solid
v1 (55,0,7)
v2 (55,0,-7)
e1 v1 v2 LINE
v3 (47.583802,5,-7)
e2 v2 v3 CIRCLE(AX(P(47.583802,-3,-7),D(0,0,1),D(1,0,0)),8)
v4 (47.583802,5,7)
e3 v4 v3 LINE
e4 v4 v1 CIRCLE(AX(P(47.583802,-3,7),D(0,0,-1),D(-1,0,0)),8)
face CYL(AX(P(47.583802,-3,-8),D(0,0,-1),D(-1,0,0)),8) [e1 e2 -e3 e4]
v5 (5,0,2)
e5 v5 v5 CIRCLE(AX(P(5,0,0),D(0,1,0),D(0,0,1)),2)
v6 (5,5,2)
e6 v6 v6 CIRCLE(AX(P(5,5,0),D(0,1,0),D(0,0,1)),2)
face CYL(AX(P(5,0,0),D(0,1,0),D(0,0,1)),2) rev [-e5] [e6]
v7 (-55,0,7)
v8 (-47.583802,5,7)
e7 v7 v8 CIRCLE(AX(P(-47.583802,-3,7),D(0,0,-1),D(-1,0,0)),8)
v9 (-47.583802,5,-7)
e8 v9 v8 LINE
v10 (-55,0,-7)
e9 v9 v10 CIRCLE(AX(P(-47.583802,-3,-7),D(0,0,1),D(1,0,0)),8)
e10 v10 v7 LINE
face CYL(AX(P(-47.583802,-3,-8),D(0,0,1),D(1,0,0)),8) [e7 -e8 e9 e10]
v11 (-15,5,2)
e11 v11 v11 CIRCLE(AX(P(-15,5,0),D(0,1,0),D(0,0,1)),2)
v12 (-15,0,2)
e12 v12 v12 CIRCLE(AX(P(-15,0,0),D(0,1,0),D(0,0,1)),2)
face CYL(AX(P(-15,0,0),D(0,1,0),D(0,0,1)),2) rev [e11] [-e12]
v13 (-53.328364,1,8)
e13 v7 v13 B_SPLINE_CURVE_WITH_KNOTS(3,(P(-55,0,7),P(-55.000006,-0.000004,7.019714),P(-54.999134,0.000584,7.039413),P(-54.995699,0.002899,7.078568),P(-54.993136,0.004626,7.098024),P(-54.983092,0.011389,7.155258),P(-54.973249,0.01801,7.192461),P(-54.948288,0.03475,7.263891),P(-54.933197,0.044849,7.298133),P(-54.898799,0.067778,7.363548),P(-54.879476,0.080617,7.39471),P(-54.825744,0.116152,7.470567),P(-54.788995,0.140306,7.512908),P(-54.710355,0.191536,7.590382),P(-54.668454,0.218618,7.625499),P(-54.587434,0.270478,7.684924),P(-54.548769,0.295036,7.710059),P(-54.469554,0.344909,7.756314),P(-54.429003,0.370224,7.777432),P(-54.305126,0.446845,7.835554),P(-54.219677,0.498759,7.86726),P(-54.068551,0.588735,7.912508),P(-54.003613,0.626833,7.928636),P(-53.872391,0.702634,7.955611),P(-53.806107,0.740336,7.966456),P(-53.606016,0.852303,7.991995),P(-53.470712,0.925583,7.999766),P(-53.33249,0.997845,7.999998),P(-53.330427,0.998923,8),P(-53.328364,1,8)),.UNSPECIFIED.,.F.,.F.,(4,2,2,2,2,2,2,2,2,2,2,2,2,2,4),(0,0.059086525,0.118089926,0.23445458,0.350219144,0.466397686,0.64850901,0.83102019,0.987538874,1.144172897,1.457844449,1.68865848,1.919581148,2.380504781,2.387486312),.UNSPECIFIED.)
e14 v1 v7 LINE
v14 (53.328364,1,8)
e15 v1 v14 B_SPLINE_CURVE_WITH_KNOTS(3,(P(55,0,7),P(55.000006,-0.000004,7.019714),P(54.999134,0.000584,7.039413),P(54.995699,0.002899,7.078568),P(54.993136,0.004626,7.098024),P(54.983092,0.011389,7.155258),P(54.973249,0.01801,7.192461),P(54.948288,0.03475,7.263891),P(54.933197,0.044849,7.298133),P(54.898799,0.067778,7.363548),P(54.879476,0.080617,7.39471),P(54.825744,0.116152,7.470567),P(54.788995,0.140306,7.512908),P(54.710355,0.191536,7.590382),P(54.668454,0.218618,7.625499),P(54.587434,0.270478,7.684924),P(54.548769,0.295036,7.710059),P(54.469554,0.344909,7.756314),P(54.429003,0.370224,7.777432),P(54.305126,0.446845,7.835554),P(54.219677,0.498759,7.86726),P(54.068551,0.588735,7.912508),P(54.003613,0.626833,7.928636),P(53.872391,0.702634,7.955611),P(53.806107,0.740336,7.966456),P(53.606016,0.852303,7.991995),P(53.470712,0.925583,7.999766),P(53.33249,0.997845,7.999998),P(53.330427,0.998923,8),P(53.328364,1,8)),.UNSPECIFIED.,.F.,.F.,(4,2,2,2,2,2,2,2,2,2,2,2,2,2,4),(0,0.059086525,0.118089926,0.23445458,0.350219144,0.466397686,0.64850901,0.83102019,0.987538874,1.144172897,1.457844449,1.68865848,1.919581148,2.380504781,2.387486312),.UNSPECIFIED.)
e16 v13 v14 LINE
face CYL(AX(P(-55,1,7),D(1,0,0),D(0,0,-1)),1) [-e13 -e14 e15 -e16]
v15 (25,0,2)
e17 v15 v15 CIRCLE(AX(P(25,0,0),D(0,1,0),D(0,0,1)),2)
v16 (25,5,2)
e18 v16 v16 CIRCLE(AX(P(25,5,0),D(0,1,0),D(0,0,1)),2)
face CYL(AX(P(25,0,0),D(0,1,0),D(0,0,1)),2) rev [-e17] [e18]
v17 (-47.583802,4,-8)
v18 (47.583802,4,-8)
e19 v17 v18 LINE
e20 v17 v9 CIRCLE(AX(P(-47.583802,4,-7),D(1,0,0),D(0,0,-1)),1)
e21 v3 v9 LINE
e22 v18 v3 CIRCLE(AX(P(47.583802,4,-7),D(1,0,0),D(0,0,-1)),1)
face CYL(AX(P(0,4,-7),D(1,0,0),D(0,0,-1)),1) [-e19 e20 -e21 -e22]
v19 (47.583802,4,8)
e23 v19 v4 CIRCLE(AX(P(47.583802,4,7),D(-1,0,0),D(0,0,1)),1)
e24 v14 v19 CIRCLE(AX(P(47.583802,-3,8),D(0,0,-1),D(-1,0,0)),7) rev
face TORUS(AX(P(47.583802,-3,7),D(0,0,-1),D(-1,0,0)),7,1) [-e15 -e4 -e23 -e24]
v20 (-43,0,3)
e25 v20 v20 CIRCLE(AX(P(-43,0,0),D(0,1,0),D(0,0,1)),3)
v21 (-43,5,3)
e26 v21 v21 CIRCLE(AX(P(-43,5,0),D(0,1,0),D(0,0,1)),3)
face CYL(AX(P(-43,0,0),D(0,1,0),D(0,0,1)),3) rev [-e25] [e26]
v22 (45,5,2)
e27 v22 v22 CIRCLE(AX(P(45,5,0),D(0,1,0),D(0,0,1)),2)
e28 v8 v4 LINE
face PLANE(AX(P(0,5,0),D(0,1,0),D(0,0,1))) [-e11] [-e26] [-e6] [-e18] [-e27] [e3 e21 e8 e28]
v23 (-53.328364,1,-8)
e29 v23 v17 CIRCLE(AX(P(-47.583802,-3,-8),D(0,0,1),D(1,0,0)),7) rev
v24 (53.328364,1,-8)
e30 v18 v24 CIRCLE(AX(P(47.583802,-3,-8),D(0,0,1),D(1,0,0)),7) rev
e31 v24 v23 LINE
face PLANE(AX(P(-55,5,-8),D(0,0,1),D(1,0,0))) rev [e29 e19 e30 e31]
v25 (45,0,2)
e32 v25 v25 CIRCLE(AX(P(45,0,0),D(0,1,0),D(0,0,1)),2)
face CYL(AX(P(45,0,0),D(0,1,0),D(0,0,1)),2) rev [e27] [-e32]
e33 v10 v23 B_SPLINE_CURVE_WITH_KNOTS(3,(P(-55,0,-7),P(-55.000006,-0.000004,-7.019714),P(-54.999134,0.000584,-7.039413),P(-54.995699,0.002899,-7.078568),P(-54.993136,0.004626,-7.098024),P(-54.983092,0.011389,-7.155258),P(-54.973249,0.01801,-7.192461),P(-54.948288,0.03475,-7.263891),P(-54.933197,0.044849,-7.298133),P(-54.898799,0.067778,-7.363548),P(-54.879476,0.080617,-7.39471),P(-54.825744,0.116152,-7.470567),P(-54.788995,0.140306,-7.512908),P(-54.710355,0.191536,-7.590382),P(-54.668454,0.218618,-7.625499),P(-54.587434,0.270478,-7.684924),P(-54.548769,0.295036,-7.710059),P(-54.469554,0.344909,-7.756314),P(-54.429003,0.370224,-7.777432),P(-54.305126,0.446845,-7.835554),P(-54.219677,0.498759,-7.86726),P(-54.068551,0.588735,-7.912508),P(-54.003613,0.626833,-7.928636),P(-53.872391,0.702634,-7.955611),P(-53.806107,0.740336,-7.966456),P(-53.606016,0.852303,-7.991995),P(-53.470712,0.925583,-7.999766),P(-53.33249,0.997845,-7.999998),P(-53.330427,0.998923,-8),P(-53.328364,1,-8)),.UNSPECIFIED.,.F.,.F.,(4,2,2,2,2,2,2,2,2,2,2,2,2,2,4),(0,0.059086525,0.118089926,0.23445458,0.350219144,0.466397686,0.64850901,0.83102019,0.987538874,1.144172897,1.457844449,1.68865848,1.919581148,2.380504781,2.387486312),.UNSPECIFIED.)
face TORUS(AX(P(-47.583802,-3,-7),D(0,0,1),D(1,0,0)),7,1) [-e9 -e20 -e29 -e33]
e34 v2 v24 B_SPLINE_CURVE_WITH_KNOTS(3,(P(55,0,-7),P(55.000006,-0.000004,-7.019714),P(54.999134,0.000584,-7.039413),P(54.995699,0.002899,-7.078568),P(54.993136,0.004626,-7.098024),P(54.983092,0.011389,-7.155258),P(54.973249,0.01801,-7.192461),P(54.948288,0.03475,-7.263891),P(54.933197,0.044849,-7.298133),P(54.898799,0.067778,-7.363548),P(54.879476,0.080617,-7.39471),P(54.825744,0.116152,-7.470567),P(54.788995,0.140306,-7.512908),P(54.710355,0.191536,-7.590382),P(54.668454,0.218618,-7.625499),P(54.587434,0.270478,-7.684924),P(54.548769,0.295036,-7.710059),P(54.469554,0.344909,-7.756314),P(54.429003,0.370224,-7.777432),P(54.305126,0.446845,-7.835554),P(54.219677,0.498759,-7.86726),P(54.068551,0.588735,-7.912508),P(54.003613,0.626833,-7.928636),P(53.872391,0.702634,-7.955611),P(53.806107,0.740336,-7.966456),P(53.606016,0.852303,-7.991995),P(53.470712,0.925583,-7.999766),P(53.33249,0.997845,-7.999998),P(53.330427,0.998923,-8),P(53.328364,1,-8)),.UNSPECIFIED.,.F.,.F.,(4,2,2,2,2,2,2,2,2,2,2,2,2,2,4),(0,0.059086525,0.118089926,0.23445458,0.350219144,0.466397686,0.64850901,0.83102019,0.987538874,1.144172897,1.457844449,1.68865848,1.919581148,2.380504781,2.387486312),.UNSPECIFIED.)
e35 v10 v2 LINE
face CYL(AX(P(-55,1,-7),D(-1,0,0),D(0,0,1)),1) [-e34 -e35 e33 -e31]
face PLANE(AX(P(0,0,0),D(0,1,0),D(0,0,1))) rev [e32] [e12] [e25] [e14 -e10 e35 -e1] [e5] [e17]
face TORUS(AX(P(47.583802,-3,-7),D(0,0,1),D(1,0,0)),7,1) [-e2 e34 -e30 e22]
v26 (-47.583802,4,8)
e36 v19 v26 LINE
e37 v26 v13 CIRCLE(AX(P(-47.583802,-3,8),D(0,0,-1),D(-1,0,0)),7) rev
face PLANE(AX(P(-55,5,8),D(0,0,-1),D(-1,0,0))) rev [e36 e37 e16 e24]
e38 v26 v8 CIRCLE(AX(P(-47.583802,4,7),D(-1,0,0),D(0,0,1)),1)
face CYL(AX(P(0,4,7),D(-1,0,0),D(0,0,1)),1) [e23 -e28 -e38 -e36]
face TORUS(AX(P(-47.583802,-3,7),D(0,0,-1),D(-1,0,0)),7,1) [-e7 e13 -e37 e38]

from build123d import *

# Parameters (mm, degrees)
SKETCH2_W           = 110
SKETCH2_H           = 16
BOSS_EXTRUDE1_DEPTH = 5
SKETCH3_R           = 3
CUT_EXTRUDE1_DEPTH  = 56.803225713
SKETCH5_R           = 2
CUT_EXTRUDE2_DEPTH  = 56.803225713
FILLET1_R           = 8
FILLET2_R           = 1


with BuildPart() as part:
    # Sketch2 → Boss-Extrude1 (new body)
    with BuildSketch(Plane(origin=(0, 0, 0), x_dir=(1, 0, 0), z_dir=(0, 1, 0))):
        Rectangle(SKETCH2_W, SKETCH2_H)
    extrude(amount=BOSS_EXTRUDE1_DEPTH)

    # Sketch3 → Cut-Extrude1 (cut, through all)
    with BuildSketch(Plane(origin=(0, 5, 0), x_dir=(1, 0, 0), z_dir=(0, 1, 0))):
        with Locations(Location((-43, 0, 0), (0, 0, 270))):
            Circle(SKETCH3_R)
    extrude(amount=-CUT_EXTRUDE1_DEPTH, mode=Mode.SUBTRACT)

    # Sketch5 → Cut-Extrude2 (cut, through all)
    with BuildSketch(Plane(origin=(0, 5, 0), x_dir=(1, 0, 0), z_dir=(0, 1, 0))):
        with Locations(Location((-15, 0, 0), (0, 0, 270))):
            Circle(SKETCH5_R)
        with Locations(Location((5, 0, 0), (0, 0, 270))):
            Circle(SKETCH5_R)
        with Locations(Location((25, 0, 0), (0, 0, 270))):
            Circle(SKETCH5_R)
        with Locations(Location((45, 0, 0), (0, 0, 270))):
            Circle(SKETCH5_R)
    extrude(amount=-CUT_EXTRUDE2_DEPTH, mode=Mode.SUBTRACT)

    # Fillet1
    # the kernel refuses this fillet: 8 mm, written as the material it takes off along each edge
    with BuildSketch(Plane(origin=(55, 5, -26.540496218), x_dir=(0, -1, 0), z_dir=(0, 0, 1)), Plane(origin=(-55, 5, 26.540496218), x_dir=(0, -1, 0), z_dir=(0, 0, -1))) as fillet1_piece_1:
        with BuildLine():
            CenterArc((8, -7.416198487), FILLET1_R, 112.024312837, 67.975687163)
            Line((0, -7.416198487), (-0.16, -7.416198487))
            Line((-0.16, -7.416198487), (-0.16, 0))
            Line((-0.16, 0), (0, 0.16))
            ThreePointArc((0, 0.16), (2.5, 0.16), (4.94, 0.14832397))
            Line((4.94, 0.14832397), (5, 0))
        make_face()
    extrude(amount=53.080992435, mode=Mode.SUBTRACT)

    # Fillet2
    fillet2_edges = [part.edges().sort_by_distance(p)[0] for p in [
        (0, 5, -8),
        (0, 5, 8),
        (-52.055937468, 3.633249581, -8),
        (52.055937468, 3.633249581, -8),
        (-52.055937468, 3.633249581, 8),
        (52.055937468, 3.633249581, 8),
        (0, 0, 8),
        (0, 0, -8),
    ]]
    fillet(fillet2_edges, radius=FILLET2_R)


solid = part.part
